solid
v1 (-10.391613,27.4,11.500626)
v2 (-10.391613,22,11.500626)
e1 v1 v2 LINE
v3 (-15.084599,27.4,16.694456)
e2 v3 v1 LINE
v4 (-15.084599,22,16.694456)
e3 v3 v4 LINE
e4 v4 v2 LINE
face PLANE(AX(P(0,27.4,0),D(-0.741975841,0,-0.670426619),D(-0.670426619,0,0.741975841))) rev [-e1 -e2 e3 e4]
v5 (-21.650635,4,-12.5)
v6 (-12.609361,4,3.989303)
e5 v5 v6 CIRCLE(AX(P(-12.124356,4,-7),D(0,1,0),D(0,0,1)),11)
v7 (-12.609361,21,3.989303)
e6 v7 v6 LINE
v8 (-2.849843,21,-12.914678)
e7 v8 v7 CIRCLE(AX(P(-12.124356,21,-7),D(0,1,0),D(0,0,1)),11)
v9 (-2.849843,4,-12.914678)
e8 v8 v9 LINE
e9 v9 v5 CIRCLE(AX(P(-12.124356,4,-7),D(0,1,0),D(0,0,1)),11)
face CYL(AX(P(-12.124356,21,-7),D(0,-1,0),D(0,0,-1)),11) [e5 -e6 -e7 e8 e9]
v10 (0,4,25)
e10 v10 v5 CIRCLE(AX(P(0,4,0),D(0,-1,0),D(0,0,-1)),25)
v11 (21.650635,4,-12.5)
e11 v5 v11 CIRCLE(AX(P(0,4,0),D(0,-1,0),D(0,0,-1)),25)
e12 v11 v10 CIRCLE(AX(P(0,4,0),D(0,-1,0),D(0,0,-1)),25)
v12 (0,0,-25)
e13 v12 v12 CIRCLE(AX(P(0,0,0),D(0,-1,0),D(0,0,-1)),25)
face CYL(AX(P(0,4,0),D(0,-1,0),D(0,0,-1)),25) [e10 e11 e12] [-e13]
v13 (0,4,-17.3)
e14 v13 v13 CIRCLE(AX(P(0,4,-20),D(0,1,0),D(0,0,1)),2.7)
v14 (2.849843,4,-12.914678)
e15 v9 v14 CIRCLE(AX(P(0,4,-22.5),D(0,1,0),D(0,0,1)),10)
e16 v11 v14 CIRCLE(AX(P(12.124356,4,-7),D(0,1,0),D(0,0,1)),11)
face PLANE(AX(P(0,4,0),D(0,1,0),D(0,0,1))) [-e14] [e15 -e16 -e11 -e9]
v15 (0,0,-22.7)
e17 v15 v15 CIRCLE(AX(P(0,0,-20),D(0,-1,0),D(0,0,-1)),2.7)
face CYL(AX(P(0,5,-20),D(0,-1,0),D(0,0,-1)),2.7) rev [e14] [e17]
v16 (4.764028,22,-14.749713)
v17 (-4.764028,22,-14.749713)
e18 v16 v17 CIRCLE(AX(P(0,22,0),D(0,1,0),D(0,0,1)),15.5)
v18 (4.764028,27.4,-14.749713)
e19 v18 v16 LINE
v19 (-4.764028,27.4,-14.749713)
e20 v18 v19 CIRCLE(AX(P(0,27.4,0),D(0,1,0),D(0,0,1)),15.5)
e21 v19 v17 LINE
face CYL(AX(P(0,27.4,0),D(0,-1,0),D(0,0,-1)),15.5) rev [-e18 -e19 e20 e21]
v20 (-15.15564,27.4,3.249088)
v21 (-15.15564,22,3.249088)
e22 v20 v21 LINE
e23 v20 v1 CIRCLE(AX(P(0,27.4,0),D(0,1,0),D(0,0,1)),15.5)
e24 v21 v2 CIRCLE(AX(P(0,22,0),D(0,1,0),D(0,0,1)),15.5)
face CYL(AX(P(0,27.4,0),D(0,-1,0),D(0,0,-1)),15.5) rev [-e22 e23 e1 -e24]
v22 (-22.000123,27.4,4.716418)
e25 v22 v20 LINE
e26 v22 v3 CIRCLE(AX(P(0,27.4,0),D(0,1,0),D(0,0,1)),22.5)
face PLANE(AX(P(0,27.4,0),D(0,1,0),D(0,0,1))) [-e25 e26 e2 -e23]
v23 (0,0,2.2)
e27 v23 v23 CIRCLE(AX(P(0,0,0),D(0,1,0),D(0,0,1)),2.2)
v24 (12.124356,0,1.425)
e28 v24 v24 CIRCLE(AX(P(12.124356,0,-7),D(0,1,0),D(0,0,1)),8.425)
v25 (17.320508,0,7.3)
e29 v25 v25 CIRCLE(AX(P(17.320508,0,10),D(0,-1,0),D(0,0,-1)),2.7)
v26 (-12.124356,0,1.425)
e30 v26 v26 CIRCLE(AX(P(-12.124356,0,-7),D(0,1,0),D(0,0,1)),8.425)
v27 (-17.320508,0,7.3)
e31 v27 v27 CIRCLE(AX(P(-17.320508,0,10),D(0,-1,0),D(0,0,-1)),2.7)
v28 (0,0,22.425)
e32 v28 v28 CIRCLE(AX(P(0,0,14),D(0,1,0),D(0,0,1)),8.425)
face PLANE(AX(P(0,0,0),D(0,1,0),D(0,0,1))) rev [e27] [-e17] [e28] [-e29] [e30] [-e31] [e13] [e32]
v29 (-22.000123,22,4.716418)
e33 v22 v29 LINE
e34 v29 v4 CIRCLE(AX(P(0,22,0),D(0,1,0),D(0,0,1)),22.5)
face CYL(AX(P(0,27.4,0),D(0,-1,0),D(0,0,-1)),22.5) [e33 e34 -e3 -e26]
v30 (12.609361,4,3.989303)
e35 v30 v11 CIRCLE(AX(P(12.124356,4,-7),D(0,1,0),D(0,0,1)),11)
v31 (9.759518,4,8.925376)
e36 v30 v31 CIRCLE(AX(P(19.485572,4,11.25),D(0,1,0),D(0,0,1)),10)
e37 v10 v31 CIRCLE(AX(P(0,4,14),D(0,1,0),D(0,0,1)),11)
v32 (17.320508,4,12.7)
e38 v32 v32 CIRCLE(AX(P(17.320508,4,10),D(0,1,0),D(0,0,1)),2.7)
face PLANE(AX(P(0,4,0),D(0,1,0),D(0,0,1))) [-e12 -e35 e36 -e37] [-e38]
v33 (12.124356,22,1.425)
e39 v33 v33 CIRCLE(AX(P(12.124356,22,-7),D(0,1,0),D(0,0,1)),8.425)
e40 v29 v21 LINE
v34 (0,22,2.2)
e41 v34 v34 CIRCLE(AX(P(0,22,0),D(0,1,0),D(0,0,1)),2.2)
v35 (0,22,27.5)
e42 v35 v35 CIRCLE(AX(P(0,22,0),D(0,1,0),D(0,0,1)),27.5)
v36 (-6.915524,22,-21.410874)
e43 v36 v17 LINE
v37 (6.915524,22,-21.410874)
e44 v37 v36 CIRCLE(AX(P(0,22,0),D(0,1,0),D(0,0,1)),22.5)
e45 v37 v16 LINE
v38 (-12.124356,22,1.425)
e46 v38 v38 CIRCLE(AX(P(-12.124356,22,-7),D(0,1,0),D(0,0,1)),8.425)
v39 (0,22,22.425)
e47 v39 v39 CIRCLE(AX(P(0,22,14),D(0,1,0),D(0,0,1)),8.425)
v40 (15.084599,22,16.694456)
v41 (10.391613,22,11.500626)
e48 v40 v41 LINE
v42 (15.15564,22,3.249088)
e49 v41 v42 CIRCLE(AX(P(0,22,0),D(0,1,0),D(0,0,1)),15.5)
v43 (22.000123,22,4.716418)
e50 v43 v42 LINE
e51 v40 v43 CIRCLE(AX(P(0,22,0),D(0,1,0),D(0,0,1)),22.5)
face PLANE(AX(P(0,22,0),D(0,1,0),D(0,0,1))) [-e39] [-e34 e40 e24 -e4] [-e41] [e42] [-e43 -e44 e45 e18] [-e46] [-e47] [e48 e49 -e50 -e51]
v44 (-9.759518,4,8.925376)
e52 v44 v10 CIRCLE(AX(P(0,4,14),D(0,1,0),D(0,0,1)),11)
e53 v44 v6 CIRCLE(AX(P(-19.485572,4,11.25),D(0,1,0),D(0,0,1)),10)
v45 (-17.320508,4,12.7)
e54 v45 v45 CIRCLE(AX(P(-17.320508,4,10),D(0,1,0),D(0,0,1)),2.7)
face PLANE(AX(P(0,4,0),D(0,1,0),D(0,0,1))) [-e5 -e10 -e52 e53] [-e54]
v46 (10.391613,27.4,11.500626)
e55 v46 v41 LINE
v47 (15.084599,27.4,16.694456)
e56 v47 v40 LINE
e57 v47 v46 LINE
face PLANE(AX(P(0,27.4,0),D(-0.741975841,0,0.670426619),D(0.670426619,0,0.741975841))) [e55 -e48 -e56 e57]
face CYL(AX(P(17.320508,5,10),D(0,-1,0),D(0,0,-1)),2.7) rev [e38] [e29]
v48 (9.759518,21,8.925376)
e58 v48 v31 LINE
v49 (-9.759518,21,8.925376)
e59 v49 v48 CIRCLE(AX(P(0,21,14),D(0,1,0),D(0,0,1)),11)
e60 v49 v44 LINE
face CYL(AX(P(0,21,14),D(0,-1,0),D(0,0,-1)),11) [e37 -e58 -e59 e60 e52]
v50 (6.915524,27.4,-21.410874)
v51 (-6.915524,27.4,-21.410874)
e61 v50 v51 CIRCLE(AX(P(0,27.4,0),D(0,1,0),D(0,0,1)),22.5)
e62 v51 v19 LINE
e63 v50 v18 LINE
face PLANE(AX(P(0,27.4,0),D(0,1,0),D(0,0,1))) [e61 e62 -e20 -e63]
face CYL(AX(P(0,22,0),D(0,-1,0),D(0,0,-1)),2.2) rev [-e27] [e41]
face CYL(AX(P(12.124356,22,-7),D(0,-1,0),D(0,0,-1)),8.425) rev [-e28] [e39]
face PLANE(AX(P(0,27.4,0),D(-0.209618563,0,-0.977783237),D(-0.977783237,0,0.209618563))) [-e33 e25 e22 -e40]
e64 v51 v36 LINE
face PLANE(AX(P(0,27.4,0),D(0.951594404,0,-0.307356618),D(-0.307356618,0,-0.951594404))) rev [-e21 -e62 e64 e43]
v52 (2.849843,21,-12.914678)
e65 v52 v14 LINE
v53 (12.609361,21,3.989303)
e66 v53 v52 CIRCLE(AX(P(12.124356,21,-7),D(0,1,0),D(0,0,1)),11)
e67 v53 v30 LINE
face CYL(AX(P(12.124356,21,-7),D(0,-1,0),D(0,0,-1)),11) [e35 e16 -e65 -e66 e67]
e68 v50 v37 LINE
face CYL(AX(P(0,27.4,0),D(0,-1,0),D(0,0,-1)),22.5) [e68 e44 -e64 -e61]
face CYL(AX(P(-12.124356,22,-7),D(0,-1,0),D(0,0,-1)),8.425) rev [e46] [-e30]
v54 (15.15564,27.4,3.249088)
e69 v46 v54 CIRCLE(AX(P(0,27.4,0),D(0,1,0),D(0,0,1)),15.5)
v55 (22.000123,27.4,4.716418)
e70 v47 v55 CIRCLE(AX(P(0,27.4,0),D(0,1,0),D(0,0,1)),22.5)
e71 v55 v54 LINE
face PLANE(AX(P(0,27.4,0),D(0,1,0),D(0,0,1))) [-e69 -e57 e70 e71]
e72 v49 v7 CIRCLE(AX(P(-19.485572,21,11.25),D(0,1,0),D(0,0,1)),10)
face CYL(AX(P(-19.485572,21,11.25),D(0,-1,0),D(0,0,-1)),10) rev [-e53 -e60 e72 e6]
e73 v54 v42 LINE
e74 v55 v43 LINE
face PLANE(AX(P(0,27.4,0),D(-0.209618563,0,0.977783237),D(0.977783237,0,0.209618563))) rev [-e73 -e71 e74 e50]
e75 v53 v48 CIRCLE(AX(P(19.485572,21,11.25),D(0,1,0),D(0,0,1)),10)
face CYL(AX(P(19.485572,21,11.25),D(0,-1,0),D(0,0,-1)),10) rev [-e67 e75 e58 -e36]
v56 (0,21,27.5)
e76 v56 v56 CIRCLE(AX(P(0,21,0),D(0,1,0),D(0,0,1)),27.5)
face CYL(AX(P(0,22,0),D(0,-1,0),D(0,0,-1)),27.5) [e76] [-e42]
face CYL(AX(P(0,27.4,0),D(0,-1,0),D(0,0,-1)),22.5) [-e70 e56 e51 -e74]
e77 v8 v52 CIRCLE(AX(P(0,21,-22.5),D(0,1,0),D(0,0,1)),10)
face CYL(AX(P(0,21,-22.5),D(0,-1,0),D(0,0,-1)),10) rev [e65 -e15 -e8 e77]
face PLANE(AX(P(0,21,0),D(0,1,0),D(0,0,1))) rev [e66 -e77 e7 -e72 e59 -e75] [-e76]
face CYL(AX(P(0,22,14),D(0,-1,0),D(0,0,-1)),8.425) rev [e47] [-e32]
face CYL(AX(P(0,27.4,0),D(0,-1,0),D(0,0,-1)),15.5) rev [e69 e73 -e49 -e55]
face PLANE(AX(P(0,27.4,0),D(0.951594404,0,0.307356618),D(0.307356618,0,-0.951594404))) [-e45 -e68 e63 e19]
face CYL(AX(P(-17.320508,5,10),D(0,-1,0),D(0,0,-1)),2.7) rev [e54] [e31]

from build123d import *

# Parameters (mm, degrees)
SKETCH1_R           = 27.5
SKETCH1_R_2         = 2.2
SKETCH1_R_3         = 8.425
BOSS_EXTRUDE1_DEPTH = 22
BOSS_EXTRUDE2_DEPTH = 5.4
SKETCH5_R           = 40.989273042
CUT_EXTRUDE1_DEPTH  = 17
SKETCH6_R           = 2.7
CUT_EXTRUDE2_DEPTH  = 5
SKETCH7_R           = 33.756466266
SKETCH7_R_2         = 25
CUT_EXTRUDE6_DEPTH  = 4


with BuildPart() as part:
    # Sketch1 → Boss-Extrude1 (new body)
    with BuildSketch(Plane(origin=(0, 0, 0), x_dir=(1, 0, 0), z_dir=(0, 1, 0))):
        Circle(SKETCH1_R)
        Circle(SKETCH1_R_2, mode=Mode.SUBTRACT)
        with Locations((0, -14)):
            Circle(SKETCH1_R_3, mode=Mode.SUBTRACT)
        with Locations((-12.124355653, 7)):
            Circle(SKETCH1_R_3, mode=Mode.SUBTRACT)
        with Locations((12.124355653, 7)):
            Circle(SKETCH1_R_3, mode=Mode.SUBTRACT)
    extrude(amount=BOSS_EXTRUDE1_DEPTH)

    # Sketch4 → Boss-Extrude2 (add)
    with BuildSketch(Plane(origin=(0, 22, 0), x_dir=(1, 0, 0), z_dir=(0, 1, 0))):
        with BuildLine():
            ThreePointArc((15.15564017, -3.249087725), (13.423393759, -7.75), (10.391612594, -11.500625535))
            Line((10.391612594, -11.500625535), (15.084598927, -16.694456422))
            ThreePointArc((15.084598927, -16.694456422), (19.485571585, -11.25), (22.000122827, -4.716417665))
            Line((22.000122827, -4.716417665), (15.15564017, -3.249087725))
        make_face()
        with BuildLine():
            Line((-15.084598927, -16.694456422), (-10.391612594, -11.500625535))
            ThreePointArc((-10.391612594, -11.500625535), (-13.423393759, -7.75), (-15.15564017, -3.249087725))
            Line((-15.15564017, -3.249087725), (-22.000122827, -4.716417665))
            ThreePointArc((-22.000122827, -4.716417665), (-19.485571585, -11.25), (-15.084598927, -16.694456422))
        make_face()
        with BuildLine():
            ThreePointArc((-4.764027576, 14.74971326), (0, 15.5), (4.764027576, 14.74971326))
            Line((4.764027576, 14.74971326), (6.9155239, 21.410874087))
            ThreePointArc((6.9155239, 21.410874087), (0, 22.5), (-6.9155239, 21.410874087))
            Line((-6.9155239, 21.410874087), (-4.764027576, 14.74971326))
        make_face()
    extrude(amount=BOSS_EXTRUDE2_DEPTH)

    # Sketch5 → Cut-Extrude1 (cut)
    with BuildSketch(Plane(origin=(0, 4, 0), x_dir=(1, 0, 0), z_dir=(0, 1, 0))):
        Circle(SKETCH5_R)
        with BuildLine():
            ThreePointArc((-2.849843175, 12.914678207), (0, 12.5), (2.849843175, 12.914678207))
            ThreePointArc((2.849843175, 12.914678207), (21.650635095, 12.5), (12.609360996, -3.989302517))
            ThreePointArc((12.609360996, -3.989302517), (10.825317547, -6.25), (9.759517821, -8.925375689))
            ThreePointArc((9.759517821, -8.925375689), (0, -25), (-9.759517821, -8.925375689))
            ThreePointArc((-9.759517821, -8.925375689), (-10.825317547, -6.25), (-12.609360996, -3.989302517))
            ThreePointArc((-12.609360996, -3.989302517), (-21.650635095, 12.5), (-2.849843175, 12.914678207))
        make_face(mode=Mode.SUBTRACT)
    extrude(amount=CUT_EXTRUDE1_DEPTH, mode=Mode.SUBTRACT)

    # Sketch6 → Cut-Extrude2 (cut)
    with BuildSketch(Plane.XZ):
        with Locations((0, -20)):
            Circle(SKETCH6_R)
        with Locations((-17.320508076, 10)):
            Circle(SKETCH6_R)
        with Locations((17.320508076, 10)):
            Circle(SKETCH6_R)
    extrude(amount=-CUT_EXTRUDE2_DEPTH, mode=Mode.SUBTRACT)

    # Sketch7 → Cut-Extrude6 (cut)
    with BuildSketch(Plane.XZ):
        Circle(SKETCH7_R)
        Circle(SKETCH7_R_2, mode=Mode.SUBTRACT)
    extrude(amount=-CUT_EXTRUDE6_DEPTH, mode=Mode.SUBTRACT)


solid = part.part
